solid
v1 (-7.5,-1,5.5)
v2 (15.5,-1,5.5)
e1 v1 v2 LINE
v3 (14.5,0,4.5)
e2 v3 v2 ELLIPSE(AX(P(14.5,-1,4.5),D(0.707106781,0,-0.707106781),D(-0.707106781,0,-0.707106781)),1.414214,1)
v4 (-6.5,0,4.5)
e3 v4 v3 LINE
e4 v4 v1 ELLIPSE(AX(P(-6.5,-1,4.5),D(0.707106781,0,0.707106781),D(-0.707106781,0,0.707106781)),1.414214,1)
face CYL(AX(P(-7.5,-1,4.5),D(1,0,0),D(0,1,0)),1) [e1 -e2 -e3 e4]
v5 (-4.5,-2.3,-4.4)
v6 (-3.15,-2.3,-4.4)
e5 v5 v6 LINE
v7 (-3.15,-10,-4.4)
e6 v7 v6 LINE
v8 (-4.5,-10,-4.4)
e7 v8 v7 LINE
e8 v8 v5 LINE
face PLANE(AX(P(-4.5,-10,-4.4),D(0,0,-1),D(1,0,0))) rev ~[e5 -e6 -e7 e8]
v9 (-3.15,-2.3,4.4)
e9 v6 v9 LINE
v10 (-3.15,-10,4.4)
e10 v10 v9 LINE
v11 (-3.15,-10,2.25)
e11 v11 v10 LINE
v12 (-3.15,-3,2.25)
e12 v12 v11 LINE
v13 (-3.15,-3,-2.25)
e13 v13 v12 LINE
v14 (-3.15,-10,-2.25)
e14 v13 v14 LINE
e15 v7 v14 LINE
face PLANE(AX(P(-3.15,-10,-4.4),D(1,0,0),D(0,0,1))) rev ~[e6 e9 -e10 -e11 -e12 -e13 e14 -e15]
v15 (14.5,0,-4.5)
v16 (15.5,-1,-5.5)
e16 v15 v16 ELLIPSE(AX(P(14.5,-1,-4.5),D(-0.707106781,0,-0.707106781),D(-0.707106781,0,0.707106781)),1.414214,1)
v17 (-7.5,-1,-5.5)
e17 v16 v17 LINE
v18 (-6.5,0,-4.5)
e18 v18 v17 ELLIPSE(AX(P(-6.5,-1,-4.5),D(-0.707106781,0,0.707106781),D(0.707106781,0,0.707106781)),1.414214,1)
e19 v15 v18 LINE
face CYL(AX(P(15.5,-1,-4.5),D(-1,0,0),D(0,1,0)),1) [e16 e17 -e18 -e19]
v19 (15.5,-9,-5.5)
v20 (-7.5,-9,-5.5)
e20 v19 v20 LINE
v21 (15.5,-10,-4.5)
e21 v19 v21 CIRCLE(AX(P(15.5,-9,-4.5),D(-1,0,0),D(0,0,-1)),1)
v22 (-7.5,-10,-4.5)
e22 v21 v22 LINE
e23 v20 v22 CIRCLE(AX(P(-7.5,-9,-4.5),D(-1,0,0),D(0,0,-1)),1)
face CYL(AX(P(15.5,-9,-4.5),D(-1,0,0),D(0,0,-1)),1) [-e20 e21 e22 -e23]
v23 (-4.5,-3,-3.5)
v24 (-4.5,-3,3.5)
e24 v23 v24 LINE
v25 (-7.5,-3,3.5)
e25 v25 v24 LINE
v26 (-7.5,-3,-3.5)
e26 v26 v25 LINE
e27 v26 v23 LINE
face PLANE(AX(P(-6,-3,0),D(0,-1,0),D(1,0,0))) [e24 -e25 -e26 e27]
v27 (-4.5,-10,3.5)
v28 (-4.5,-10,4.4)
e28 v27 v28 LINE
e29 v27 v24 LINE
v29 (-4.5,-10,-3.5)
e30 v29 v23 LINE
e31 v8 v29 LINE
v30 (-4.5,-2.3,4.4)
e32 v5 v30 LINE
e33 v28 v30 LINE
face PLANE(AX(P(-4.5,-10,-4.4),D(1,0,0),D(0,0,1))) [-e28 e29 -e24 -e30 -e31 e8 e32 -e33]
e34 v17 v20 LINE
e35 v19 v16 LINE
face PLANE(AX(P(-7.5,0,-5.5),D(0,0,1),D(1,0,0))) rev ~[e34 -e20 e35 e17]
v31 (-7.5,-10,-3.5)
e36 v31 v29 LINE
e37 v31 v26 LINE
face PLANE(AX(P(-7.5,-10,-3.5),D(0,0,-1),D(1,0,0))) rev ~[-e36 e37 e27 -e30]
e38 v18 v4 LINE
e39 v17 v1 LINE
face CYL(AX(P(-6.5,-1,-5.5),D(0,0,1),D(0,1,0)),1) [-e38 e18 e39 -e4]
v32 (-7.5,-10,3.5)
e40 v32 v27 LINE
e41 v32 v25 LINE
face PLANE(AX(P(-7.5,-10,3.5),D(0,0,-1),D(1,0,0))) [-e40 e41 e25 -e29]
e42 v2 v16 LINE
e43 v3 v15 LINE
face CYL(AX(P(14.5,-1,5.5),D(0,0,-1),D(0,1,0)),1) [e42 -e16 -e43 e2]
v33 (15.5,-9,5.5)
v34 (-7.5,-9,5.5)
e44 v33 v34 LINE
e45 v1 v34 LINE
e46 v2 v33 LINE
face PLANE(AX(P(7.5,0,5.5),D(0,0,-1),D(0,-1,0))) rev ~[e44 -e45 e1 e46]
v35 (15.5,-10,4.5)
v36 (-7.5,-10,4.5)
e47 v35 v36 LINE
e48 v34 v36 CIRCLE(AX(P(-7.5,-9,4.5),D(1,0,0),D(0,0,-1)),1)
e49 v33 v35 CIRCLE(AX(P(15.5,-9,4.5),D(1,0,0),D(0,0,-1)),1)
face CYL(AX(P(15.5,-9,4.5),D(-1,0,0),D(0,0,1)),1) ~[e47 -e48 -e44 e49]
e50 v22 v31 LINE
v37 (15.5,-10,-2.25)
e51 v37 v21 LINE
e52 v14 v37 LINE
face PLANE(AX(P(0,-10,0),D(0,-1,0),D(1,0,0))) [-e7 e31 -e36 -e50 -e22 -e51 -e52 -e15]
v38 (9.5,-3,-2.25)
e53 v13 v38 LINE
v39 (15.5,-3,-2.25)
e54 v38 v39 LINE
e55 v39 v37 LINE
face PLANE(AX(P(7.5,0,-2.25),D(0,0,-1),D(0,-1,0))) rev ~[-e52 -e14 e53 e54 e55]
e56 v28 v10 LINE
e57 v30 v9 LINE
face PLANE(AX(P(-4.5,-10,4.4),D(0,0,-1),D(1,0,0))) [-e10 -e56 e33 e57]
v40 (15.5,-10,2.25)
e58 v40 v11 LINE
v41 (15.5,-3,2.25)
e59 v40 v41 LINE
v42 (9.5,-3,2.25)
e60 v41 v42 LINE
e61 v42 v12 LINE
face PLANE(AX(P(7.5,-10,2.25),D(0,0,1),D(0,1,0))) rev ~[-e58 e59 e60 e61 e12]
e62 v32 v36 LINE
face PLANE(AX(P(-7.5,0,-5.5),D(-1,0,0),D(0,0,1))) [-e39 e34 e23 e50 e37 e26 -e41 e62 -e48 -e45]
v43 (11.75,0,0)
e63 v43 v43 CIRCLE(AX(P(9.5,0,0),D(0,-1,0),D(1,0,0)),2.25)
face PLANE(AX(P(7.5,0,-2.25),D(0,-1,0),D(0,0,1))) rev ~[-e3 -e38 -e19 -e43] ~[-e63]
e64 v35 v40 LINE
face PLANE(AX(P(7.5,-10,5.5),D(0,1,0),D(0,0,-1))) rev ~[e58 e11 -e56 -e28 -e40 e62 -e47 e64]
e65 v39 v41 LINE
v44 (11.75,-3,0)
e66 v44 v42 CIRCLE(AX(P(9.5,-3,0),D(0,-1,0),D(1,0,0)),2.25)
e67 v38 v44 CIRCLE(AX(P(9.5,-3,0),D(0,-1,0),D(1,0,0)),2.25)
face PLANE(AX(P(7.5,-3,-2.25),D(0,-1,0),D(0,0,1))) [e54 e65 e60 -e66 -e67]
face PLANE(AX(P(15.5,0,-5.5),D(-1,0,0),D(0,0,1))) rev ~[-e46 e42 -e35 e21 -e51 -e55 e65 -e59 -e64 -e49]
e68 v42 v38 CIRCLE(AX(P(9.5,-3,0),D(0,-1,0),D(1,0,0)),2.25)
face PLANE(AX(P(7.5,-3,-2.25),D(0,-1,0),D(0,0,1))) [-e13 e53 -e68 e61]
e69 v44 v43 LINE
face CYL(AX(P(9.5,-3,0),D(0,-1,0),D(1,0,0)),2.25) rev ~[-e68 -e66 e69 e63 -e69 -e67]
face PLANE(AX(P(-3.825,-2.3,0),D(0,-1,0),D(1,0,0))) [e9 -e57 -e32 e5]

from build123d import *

# Parameters (mm, degrees)
F0_W      = 15
F0_H      = 11
F1_DEPTH  = 10
F2_W      = 15
F2_H      = 4.5
F3_DEPTH  = 7
F4_W      = 3
F4_H      = 7
F5_DEPTH  = 7
F6_W      = 1.35
F6_H      = 8.8
F7_DEPTH  = 7.7
F9_DEPTH  = 8
F10_DEPTH = 8
F11_R     = 1
F12_R     = 1
F13_R     = 2.25
F14_DEPTH = 25


with BuildPart() as f1:
    # F0 (on Front) → F1 (new body)
    with BuildSketch(Plane.XZ):
        Rectangle(F0_W, F0_H)
    extrude(amount=F1_DEPTH)

    # F2 (on face) → F3 (cut)
    with BuildSketch(Plane.XZ.offset(10)):
        Rectangle(F2_W, F2_H)
    extrude(amount=-F3_DEPTH, mode=Mode.SUBTRACT)

    # F4 (on face) → F5 (cut)
    with BuildSketch(Plane.XZ.offset(10)):
        with Locations((-6, 0)):
            Rectangle(F4_W, F4_H)
    extrude(amount=-F5_DEPTH, mode=Mode.SUBTRACT)

    # F6 (on face) → F7 (cut)
    with BuildSketch(Plane.XZ.offset(10)):
        with Locations((-3.825, 0)):
            Rectangle(F6_W, F6_H)
    extrude(amount=-F7_DEPTH, mode=Mode.SUBTRACT)

    # F8 (on face) → F9 (join)
    with BuildSketch(Plane.YZ.offset(7.5)):
        Polygon((-10, 2.25), (-3, 2.25), (0, 2.25), (0, 5.5), (-10, 5.5), align=None)
        Polygon((0, -2.25), (-3, -2.25), (-10, -2.25), (-10, -5.5), (0, -5.5), align=None)
    extrude(amount=F9_DEPTH)

    # F10 (add): a face of the model
    f10_faces = [f1.faces().sort_by_distance(p)[0] for p in [
        (7.5, -1.5, 0),
    ]]
    extrude(f10_faces, amount=F10_DEPTH)

    # F11
    f11_edges = [f1.edges().sort_by_distance(p)[0] for p in [
        (-7.5, 0, 0),
        (4, 0, -5.5),
        (15.5, 0, 0),
        (4, 0, 5.5),
    ]]
    fillet(f11_edges, radius=F11_R)

    # F12
    f12_edges = [f1.edges().sort_by_distance(p)[0] for p in [
        (4, -10, 5.5),
        (4, -1, 5.5),
        (4, -10, -5.5),
        (4, -1, -5.5),
    ]]
    fillet(f12_edges, radius=F12_R)

    # F13 (on face) → F14 (cut)
    with BuildSketch(Plane.XZ.offset(3)):
        with Locations((9.5, 0)):
            Circle(F13_R)
    extrude(amount=-F14_DEPTH, mode=Mode.SUBTRACT)


solid = f1.part
